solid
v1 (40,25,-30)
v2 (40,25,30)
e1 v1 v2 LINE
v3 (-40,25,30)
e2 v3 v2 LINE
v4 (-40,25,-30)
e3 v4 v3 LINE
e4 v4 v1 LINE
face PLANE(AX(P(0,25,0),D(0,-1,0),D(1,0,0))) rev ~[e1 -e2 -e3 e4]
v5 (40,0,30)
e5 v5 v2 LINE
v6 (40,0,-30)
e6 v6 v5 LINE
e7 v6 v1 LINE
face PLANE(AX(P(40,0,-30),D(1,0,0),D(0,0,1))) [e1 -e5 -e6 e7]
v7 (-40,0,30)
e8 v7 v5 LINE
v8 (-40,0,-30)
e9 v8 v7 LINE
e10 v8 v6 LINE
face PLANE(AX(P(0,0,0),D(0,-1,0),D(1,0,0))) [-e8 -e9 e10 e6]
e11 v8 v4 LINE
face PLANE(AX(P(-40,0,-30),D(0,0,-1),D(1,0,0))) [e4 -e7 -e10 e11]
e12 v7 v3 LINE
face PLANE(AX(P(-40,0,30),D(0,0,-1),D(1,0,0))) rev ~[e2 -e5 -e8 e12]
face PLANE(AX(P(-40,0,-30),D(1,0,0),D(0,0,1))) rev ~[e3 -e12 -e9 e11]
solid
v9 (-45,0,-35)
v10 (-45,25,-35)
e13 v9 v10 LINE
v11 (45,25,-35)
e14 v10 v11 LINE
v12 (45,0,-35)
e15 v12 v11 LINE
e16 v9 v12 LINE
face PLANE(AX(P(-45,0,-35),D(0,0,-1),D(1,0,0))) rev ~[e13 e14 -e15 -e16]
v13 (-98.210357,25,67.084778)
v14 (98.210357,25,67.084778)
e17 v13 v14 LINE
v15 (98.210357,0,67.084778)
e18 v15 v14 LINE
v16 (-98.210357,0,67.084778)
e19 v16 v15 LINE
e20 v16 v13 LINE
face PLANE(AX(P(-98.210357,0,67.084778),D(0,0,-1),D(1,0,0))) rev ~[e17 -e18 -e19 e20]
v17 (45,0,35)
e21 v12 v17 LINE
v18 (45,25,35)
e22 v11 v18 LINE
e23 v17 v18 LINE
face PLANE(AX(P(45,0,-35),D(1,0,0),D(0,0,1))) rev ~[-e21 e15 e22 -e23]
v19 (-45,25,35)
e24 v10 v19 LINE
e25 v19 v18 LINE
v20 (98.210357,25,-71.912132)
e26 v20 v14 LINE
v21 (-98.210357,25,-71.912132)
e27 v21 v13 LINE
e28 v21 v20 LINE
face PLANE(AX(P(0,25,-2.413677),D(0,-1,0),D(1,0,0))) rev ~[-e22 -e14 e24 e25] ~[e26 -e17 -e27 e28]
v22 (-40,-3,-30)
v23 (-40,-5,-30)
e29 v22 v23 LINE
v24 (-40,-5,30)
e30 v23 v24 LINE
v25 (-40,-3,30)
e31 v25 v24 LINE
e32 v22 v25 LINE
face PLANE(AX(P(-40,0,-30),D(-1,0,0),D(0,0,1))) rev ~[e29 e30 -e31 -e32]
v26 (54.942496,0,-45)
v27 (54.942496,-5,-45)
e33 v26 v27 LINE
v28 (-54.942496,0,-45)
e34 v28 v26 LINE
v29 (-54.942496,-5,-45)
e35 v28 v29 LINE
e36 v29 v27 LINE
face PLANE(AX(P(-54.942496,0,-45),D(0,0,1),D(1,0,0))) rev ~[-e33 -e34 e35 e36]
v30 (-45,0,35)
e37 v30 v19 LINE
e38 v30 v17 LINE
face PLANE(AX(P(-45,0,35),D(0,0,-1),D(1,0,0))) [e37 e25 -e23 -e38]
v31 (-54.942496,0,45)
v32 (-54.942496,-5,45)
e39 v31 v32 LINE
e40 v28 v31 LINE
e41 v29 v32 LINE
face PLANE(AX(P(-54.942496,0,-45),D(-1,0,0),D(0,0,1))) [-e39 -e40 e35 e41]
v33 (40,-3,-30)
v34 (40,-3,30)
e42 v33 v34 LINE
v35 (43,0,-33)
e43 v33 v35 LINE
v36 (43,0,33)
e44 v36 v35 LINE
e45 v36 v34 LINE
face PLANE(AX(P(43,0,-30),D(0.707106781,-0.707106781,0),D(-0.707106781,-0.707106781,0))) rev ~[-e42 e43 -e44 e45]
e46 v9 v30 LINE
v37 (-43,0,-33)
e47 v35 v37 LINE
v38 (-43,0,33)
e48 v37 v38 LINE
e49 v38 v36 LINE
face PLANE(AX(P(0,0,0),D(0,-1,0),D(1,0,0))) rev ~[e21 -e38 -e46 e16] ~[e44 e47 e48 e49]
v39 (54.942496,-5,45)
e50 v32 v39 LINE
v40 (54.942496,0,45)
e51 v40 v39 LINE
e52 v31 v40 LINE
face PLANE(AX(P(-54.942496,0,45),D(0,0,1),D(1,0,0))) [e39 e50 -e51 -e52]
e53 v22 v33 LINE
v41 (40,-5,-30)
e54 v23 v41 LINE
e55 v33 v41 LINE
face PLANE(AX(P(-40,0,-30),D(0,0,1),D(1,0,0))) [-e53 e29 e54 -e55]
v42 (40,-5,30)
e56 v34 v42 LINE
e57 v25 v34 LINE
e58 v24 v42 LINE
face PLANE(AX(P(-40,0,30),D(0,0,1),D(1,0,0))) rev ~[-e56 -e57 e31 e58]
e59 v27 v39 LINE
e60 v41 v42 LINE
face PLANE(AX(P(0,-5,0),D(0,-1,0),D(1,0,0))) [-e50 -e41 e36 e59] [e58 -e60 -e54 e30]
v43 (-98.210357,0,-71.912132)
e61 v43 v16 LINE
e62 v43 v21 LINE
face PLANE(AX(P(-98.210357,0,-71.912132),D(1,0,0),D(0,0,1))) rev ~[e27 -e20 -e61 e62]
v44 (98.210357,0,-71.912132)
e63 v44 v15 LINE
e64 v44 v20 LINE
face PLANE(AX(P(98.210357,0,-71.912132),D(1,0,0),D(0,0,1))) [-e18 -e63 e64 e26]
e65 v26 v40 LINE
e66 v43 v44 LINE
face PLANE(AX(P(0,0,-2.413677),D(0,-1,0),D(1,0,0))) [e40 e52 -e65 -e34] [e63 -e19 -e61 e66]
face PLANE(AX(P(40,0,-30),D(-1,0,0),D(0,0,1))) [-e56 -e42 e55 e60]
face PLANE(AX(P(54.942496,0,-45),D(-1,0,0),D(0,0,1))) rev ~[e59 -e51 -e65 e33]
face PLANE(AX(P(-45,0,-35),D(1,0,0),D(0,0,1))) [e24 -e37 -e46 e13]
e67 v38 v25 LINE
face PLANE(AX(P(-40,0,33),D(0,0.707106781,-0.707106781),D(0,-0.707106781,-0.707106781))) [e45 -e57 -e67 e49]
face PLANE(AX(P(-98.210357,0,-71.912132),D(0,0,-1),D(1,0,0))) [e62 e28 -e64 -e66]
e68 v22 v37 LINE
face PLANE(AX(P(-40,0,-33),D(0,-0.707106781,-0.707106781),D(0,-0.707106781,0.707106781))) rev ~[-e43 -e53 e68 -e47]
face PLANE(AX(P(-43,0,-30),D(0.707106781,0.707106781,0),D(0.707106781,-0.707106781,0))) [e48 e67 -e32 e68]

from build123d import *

# Parameters (mm, degrees)
F0_W         = 80
F0_H         = 60
F1_DEPTH     = 25
F2_W         = 196.4207142591
F2_H         = 138.9969103038
F2_W_2       = 90
F2_H_2       = 70
F3_DEPTH     = 25
F4_W         = 109.8849922419
F4_H         = 90
F4_W_2       = 80
F4_H_2       = 60
F5_DEPTH     = 5
F6_T1_DEPTH  = 80
F6_T3_DEPTH  = 60
F6_T9_DEPTH  = 67.7150489639
F6_T14_DEPTH = 87.7150489639
F6_T22_DEPTH = 87.7150489639
F6_T27_DEPTH = 67.7150489639
F6_T35_DEPTH = 87.7150489639
F6_T40_DEPTH = 67.7150489639
F6_T48_DEPTH = 67.7150489639
F6_T53_DEPTH = 87.7150489639


# Not quite as in the source:
# - a fillet or chamfer that OpenCascade refuses, or shapes differently, is made with other operations: its cross-section is extruded or revolved along the edge and cut away or added


with BuildPart() as f1:
    # F0 (on Front) → F1 (new body)
    with BuildSketch(Plane.XZ):
        Rectangle(F0_W, F0_H)
    extrude(amount=-F1_DEPTH)



with BuildPart() as f3:
    # F2 (on face) → F3 (new body)
    with BuildSketch(Plane.XZ):
        with Locations((0, -2.4136770517)):
            Rectangle(F2_W, F2_H)
        Rectangle(F2_W_2, F2_H_2, mode=Mode.SUBTRACT)
    extrude(amount=-F3_DEPTH)


with BuildPart() as f1_1:
    add(f1.part)

    add(f3.part)  # F5 merges F3
    # F4 (on face) → F5 (join)
    with BuildSketch(Plane.XZ):
        Rectangle(F4_W, F4_H)
        Rectangle(F4_W_2, F4_H_2, mode=Mode.SUBTRACT)
    extrude(amount=F5_DEPTH)

    # F6: chamfer of 3 on 4 edges, made by hand

    # F6_s2 → F6_t1 (cut)
    with BuildSketch(Plane.YZ.offset(-40)):
        Polygon((0, 33), (-3, 30), (0, 30), align=None)
        Polygon((0, -33), (-3, -30), (0, -30), align=None)
    extrude(amount=F6_T1_DEPTH, mode=Mode.SUBTRACT)

    # F6_s4 → F6_t3 (cut)
    with BuildSketch(Plane.XY.offset(-30)):
        Polygon((-43, 0), (-40, -3), (-40, 0), align=None)
        Polygon((43, 0), (40, -3), (40, 0), align=None)
    extrude(amount=F6_T3_DEPTH, mode=Mode.SUBTRACT)


with BuildPart() as f6_tool7:
    # F6_s8 → F6_t9 (new body)
    with BuildSketch(Plane.XY.offset(-30)):
        Polygon((43, 0), (40, -3), (40, 0), align=None)
    extrude(amount=F6_T9_DEPTH)

    split(bisect_by=Plane.XY.offset(35), keep=Keep.BOTTOM)

    split(bisect_by=Plane.XY.offset(30), keep=Keep.TOP)


with BuildPart() as f6_tool12:
    # F6_s13 → F6_t14 (new body)
    with BuildSketch(Plane.YZ.offset(47.7150489639)):
        Polygon((0, 33), (-3, 30), (0, 30), align=None)
    extrude(amount=-F6_T14_DEPTH)

    split(bisect_by=Plane.YZ.offset(45), keep=Keep.BOTTOM)

    split(bisect_by=Plane.YZ.offset(40), keep=Keep.TOP)


with BuildPart() as f6_tool7_1:
    add(f6_tool7.part)

    # F6_t17: intersect F6_tool12
    add(f6_tool12.part, mode=Mode.INTERSECT)


with BuildPart() as f1_2:
    add(f1_1.part)

    # F6_t5: cut F6_tool7
    add(f6_tool7_1.part, mode=Mode.SUBTRACT)


with BuildPart() as f6_tool20:
    # F6_s21 → F6_t22 (new body)
    with BuildSketch(Plane.YZ.offset(40)):
        Polygon((0, 33), (-3, 30), (0, 30), align=None)
    extrude(amount=-F6_T22_DEPTH)

    split(bisect_by=Plane.YZ.offset(-45), keep=Keep.TOP)

    split(bisect_by=Plane.YZ.offset(-40), keep=Keep.BOTTOM)


with BuildPart() as f6_tool25:
    # F6_s26 → F6_t27 (new body)
    with BuildSketch(Plane.XY.offset(37.7150489639)):
        Polygon((-43, 0), (-40, -3), (-40, 0), align=None)
    extrude(amount=-F6_T27_DEPTH)

    split(bisect_by=Plane.XY.offset(35), keep=Keep.BOTTOM)

    split(bisect_by=Plane.XY.offset(30), keep=Keep.TOP)


with BuildPart() as f6_tool20_1:
    add(f6_tool20.part)

    # F6_t30: intersect F6_tool25
    add(f6_tool25.part, mode=Mode.INTERSECT)


with BuildPart() as f1_3:
    add(f1_2.part)

    # F6_t18: cut F6_tool20
    add(f6_tool20_1.part, mode=Mode.SUBTRACT)


with BuildPart() as f6_tool33:
    # F6_s34 → F6_t35 (new body)
    with BuildSketch(Plane.YZ.offset(-47.7150489639)):
        Polygon((0, -33), (-3, -30), (0, -30), align=None)
    extrude(amount=F6_T35_DEPTH)

    split(bisect_by=Plane.YZ.offset(-45), keep=Keep.TOP)

    split(bisect_by=Plane.YZ.offset(-40), keep=Keep.BOTTOM)


with BuildPart() as f6_tool38:
    # F6_s39 → F6_t40 (new body)
    with BuildSketch(Plane.XY.offset(30)):
        Polygon((-43, 0), (-40, -3), (-40, 0), align=None)
    extrude(amount=-F6_T40_DEPTH)

    split(bisect_by=Plane.XY.offset(-35), keep=Keep.TOP)

    split(bisect_by=Plane.XY.offset(-30), keep=Keep.BOTTOM)


with BuildPart() as f6_tool33_1:
    add(f6_tool33.part)

    # F6_t43: intersect F6_tool38
    add(f6_tool38.part, mode=Mode.INTERSECT)


with BuildPart() as f1_4:
    add(f1_3.part)

    # F6_t31: cut F6_tool33
    add(f6_tool33_1.part, mode=Mode.SUBTRACT)


with BuildPart() as f6_tool46:
    # F6_s47 → F6_t48 (new body)
    with BuildSketch(Plane.XY.offset(-37.7150489639)):
        Polygon((43, 0), (40, -3), (40, 0), align=None)
    extrude(amount=F6_T48_DEPTH)

    split(bisect_by=Plane.XY.offset(-35), keep=Keep.TOP)

    split(bisect_by=Plane.XY.offset(-30), keep=Keep.BOTTOM)


with BuildPart() as f6_tool51:
    # F6_s52 → F6_t53 (new body)
    with BuildSketch(Plane.YZ.offset(-40)):
        Polygon((0, -33), (-3, -30), (0, -30), align=None)
    extrude(amount=F6_T53_DEPTH)

    split(bisect_by=Plane.YZ.offset(45), keep=Keep.BOTTOM)

    split(bisect_by=Plane.YZ.offset(40), keep=Keep.TOP)


with BuildPart() as f6_tool46_1:
    add(f6_tool46.part)

    # F6_t56: intersect F6_tool51
    add(f6_tool51.part, mode=Mode.INTERSECT)


with BuildPart() as f1_5:
    add(f1_4.part)

    # F6_t44: cut F6_tool46
    add(f6_tool46_1.part, mode=Mode.SUBTRACT)


solid = f1_5.part
